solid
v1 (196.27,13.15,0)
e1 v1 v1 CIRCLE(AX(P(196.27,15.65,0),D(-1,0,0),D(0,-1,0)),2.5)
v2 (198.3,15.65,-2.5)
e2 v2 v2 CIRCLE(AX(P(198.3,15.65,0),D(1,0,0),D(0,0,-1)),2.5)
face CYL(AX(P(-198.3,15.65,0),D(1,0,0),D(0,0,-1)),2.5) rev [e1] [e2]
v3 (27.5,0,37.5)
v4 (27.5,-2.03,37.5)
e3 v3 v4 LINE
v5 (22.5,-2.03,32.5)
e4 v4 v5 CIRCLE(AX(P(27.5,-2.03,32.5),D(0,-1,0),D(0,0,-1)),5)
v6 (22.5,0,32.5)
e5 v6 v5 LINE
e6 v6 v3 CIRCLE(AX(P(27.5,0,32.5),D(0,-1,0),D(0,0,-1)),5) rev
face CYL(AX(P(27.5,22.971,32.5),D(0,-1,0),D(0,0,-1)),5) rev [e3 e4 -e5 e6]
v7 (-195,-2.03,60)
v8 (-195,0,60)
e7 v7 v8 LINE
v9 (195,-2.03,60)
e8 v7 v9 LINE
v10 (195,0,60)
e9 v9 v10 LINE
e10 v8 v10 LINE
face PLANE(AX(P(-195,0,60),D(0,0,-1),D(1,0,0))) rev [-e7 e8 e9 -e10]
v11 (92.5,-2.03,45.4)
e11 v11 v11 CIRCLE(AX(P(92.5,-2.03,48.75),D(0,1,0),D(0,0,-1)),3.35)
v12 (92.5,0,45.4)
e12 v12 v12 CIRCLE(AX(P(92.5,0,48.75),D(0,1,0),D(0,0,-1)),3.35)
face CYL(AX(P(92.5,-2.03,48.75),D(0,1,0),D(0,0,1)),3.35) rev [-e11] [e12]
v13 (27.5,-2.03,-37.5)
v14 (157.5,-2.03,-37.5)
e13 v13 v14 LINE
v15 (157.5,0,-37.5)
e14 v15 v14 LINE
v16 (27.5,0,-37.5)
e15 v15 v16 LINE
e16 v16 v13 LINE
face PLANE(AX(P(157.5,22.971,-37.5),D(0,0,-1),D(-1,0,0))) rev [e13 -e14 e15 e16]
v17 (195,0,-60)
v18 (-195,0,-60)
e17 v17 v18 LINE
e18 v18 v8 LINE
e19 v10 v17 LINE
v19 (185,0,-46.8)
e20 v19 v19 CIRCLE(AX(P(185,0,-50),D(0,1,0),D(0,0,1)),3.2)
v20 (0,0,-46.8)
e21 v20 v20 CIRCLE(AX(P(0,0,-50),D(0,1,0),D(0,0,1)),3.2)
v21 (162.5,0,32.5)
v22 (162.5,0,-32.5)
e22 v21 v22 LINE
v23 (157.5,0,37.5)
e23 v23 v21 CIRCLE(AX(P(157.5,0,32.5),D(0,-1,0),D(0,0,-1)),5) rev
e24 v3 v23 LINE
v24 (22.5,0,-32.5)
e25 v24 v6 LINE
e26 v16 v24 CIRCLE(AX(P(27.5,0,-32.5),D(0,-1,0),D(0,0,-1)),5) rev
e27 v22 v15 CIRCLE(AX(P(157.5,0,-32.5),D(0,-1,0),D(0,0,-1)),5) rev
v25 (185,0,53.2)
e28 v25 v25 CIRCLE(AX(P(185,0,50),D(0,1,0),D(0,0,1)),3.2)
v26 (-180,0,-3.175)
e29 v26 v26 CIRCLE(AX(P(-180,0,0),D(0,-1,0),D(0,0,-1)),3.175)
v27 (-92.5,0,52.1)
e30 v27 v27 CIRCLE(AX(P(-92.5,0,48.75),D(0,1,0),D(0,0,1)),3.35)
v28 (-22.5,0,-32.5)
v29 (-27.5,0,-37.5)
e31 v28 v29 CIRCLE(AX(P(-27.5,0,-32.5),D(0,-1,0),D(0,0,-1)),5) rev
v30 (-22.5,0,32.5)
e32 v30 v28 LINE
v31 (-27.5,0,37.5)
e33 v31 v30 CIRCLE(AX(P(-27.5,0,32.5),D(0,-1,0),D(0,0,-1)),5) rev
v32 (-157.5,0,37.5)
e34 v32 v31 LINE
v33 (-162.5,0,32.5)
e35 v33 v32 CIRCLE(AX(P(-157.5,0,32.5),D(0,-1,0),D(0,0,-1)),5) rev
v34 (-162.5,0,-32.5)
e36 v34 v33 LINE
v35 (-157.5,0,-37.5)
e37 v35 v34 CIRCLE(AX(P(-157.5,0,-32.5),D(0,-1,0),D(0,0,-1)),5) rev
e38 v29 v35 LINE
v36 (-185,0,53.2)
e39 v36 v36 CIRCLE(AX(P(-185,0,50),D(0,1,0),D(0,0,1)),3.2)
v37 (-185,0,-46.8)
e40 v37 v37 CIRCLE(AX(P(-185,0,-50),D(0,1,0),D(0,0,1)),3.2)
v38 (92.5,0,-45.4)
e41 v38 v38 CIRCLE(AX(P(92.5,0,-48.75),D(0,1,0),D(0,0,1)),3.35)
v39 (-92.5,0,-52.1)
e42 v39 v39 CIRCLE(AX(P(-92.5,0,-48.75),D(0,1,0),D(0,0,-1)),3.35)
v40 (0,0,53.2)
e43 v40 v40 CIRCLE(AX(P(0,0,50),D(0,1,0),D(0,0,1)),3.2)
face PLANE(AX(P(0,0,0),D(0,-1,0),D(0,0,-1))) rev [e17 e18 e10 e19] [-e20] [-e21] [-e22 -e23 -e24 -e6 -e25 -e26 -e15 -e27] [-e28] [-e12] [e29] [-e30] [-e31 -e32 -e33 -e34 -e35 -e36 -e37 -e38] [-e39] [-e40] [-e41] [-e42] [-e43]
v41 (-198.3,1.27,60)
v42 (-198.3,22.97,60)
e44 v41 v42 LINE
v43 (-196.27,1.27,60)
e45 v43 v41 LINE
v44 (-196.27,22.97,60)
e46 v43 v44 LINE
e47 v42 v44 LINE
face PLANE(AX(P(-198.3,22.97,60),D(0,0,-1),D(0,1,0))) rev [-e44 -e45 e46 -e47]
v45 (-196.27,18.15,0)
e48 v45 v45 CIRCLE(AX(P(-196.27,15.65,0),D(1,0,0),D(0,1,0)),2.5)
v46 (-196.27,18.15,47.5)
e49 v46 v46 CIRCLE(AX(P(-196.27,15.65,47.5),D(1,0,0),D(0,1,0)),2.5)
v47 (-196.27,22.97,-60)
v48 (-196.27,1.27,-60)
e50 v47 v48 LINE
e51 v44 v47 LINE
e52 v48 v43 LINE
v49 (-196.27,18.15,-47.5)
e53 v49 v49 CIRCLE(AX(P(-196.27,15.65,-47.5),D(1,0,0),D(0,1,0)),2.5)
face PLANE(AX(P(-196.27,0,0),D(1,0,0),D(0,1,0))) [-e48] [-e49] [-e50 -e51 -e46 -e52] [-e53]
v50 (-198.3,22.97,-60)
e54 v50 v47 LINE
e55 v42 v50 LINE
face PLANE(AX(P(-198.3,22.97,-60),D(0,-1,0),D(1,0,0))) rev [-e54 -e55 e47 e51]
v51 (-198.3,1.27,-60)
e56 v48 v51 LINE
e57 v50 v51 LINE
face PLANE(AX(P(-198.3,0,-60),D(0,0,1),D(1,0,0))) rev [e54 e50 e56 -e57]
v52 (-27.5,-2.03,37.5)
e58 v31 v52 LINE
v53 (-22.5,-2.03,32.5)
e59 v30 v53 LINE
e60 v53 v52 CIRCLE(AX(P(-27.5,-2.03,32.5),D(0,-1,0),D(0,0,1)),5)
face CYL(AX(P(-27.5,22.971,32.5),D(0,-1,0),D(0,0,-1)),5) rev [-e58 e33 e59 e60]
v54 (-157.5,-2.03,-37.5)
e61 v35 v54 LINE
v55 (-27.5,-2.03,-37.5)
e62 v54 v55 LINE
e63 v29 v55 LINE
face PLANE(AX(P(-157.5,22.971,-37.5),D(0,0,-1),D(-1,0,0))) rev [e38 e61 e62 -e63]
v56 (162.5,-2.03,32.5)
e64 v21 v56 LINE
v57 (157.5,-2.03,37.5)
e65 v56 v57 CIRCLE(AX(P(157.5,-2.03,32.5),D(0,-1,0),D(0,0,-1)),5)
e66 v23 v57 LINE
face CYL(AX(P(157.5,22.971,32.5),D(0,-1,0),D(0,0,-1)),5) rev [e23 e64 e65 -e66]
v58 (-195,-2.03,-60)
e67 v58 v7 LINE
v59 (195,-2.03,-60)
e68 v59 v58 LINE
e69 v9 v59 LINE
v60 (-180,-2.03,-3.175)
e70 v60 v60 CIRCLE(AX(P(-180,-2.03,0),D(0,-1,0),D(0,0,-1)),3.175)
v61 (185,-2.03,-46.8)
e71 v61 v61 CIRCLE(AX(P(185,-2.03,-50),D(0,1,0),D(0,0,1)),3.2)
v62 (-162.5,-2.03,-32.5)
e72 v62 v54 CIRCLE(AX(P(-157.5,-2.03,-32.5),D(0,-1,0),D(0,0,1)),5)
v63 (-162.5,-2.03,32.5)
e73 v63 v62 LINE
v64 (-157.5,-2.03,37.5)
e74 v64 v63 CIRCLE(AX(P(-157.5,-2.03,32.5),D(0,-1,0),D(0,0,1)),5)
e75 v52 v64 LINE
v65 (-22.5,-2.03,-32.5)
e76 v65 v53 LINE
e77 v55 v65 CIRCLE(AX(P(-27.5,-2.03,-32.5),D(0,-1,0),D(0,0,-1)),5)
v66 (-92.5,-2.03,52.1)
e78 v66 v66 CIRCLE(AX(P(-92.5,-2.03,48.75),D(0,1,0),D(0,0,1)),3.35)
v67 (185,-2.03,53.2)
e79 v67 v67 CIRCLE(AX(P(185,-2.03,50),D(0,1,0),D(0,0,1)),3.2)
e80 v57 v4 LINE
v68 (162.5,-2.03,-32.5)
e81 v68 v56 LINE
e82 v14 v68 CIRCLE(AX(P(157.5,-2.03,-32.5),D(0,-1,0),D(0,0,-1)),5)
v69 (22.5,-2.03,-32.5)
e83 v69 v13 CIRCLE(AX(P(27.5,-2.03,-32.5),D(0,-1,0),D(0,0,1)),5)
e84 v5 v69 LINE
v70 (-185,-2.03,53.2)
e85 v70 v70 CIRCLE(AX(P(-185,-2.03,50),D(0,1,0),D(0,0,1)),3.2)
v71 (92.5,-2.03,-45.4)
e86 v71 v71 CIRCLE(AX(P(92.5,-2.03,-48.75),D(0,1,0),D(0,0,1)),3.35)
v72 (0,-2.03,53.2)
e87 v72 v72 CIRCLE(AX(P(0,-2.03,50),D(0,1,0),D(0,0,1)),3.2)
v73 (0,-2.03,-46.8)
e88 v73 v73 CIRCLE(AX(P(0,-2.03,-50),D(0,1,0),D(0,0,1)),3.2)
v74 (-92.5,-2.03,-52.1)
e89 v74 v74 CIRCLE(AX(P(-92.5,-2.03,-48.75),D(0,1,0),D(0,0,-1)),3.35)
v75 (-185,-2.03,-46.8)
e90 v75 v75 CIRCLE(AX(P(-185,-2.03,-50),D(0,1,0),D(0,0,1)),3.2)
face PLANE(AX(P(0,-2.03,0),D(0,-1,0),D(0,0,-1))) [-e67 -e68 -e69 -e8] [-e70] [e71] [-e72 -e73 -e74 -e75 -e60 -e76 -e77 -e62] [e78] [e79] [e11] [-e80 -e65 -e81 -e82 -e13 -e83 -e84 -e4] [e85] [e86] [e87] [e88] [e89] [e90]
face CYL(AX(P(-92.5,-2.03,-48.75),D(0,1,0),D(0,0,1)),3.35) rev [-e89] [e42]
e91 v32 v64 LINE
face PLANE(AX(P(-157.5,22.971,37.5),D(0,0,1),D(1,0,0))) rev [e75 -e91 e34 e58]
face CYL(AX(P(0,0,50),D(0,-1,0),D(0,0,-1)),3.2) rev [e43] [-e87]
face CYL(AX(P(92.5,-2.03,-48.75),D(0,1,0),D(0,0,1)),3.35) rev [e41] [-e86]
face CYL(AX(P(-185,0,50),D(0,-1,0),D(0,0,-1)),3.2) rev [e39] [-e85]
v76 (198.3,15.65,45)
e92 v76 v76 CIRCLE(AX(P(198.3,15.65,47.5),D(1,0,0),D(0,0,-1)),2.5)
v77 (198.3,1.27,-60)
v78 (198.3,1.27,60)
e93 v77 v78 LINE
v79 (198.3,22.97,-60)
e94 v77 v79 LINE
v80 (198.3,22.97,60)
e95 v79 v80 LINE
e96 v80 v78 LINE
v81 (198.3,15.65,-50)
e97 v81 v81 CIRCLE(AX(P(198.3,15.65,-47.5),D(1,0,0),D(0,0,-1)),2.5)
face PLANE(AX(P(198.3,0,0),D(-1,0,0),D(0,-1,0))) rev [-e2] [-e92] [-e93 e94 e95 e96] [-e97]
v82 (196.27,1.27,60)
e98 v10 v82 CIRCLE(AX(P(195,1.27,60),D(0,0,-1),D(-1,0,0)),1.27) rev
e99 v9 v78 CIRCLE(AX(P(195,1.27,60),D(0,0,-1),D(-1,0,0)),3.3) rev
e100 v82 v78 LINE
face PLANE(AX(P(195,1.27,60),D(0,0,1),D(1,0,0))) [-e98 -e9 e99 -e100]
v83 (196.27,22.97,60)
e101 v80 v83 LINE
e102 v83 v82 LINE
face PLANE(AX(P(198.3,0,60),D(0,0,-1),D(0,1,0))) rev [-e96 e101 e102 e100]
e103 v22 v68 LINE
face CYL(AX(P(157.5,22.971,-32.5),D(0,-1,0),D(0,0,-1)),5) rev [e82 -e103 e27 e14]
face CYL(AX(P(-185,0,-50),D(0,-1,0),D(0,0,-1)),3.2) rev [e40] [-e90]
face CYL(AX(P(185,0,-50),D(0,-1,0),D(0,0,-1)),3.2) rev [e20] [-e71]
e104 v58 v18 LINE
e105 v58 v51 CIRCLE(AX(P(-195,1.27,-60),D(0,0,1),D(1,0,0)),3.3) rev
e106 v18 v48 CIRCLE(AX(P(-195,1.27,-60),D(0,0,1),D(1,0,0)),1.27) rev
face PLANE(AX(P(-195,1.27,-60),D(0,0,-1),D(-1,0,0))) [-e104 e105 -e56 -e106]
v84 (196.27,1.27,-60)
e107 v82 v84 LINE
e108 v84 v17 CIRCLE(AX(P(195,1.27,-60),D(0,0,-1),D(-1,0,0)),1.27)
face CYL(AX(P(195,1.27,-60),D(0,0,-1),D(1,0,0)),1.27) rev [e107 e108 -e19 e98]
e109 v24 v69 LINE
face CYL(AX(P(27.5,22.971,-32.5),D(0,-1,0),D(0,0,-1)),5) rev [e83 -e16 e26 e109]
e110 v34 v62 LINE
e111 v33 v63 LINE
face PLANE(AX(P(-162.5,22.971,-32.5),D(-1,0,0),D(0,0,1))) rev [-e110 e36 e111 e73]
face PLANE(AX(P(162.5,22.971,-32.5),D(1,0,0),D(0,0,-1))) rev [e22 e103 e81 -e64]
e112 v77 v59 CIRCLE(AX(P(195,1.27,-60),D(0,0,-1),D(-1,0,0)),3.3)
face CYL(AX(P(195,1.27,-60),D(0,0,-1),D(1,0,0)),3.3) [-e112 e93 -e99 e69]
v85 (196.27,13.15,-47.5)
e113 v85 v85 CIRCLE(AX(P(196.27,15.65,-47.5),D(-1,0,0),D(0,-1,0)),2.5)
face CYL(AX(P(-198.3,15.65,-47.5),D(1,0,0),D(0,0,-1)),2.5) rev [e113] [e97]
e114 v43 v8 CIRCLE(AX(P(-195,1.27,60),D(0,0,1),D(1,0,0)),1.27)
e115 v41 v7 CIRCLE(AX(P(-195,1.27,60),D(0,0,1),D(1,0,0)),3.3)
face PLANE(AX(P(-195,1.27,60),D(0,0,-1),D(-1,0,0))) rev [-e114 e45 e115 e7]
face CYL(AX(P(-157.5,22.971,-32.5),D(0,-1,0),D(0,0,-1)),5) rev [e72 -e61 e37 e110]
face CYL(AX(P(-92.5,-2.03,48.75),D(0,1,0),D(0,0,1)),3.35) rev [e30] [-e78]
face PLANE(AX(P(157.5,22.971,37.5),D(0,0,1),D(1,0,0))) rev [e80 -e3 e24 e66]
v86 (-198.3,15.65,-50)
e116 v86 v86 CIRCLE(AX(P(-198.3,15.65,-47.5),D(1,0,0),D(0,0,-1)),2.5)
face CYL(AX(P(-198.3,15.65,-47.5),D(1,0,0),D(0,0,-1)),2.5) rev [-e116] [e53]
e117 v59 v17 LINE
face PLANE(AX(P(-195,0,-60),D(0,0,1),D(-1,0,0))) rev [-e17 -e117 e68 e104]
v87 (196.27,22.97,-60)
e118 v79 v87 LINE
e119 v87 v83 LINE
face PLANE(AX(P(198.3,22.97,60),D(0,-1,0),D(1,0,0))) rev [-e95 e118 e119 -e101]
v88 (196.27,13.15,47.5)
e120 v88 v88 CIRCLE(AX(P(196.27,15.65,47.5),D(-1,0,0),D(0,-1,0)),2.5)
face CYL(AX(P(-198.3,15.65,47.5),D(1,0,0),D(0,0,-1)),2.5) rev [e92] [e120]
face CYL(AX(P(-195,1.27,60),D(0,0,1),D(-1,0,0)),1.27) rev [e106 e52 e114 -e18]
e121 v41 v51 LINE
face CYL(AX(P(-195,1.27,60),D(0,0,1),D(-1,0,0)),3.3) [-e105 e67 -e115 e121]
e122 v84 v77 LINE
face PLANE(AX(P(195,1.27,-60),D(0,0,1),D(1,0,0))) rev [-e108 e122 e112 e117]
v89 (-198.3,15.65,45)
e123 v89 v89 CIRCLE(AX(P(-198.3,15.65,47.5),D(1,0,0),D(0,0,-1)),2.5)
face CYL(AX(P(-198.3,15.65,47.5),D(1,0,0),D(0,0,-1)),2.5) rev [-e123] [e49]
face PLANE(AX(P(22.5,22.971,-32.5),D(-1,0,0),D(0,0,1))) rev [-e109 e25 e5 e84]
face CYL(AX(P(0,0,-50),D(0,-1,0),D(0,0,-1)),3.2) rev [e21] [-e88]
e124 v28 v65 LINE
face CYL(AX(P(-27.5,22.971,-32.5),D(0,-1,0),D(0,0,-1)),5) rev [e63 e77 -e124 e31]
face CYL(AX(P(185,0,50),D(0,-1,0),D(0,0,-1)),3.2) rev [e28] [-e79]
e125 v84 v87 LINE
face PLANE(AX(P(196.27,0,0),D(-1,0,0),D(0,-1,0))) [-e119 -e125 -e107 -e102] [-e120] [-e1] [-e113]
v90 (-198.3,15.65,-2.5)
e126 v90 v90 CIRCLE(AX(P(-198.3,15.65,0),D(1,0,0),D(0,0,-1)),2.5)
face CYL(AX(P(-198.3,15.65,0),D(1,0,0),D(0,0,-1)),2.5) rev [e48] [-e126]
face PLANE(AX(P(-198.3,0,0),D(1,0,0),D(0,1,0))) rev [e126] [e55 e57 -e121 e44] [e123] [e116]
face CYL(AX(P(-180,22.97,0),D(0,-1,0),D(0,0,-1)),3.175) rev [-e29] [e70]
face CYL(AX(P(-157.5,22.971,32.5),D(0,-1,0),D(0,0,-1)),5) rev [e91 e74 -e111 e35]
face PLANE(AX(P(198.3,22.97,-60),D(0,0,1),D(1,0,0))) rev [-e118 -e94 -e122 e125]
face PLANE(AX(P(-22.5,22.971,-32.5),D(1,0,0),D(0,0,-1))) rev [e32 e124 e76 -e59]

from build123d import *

# Parameters (mm, degrees)
SKETCH1_W               = 390
SKETCH1_H               = 120
SKETCH1_R               = 3.2
BOSS_EXTRUDE1_DEPTH     = 2.03
EDGE_FLANGE1_DEPTH      = 120
EDGE_FLANGE1_BEND_DEPTH = 120
CUT_EXTRUDE1_REACH      = 210.681
CUT_EXTRUDE2_DEPTH      = 209.447861347
CUT_EXTRUDE2_DEPTH_BACK = 209.447861347
SKETCH19_R              = 2.5
SKETCH20_R              = 3.35
CUT_EXTRUDE3_DEPTH      = 209.447861347
SKETCH21_R              = 3.175
CUT_EXTRUDE4_DEPTH      = 209.681312053


# Sheet-metal steps are written as plain solids
with BuildPart() as part:
    # Sketch1 → Boss-Extrude1 (new body)
    with BuildSketch(Plane(origin=(0, 0, 0), x_dir=(1, 0, 0), z_dir=(0, 1, 0))):
        Rectangle(SKETCH1_W, SKETCH1_H)
        with Locations(Location((0, 50, 0), (0, 0, 270))):
            Circle(SKETCH1_R, mode=Mode.SUBTRACT)
        with Locations(Location((-185, 50, 0), (0, 0, 270))):
            Circle(SKETCH1_R, mode=Mode.SUBTRACT)
        with Locations(Location((-185, -50, 0), (0, 0, 270))):
            Circle(SKETCH1_R, mode=Mode.SUBTRACT)
        with Locations(Location((0, -50, 0), (0, 0, 270))):
            Circle(SKETCH1_R, mode=Mode.SUBTRACT)
        with Locations(Location((185, -50, 0), (0, 0, 270))):
            Circle(SKETCH1_R, mode=Mode.SUBTRACT)
        with Locations(Location((185, 50, 0), (0, 0, 270))):
            Circle(SKETCH1_R, mode=Mode.SUBTRACT)
    extrude(amount=-BOSS_EXTRUDE1_DEPTH)

    # Edge-Flange1 section (across the edge) → Edge-Flange1 (add)
    with BuildSketch(Plane(origin=(-196.27, 0, -60), x_dir=(1, 0, 0), z_dir=(0, 0, 1))):
        with BuildLine():
            Line((-2.03, 1.27), (-2.03, 22.97))
            Line((-2.03, 22.97), (0, 22.97))
            Line((0, 22.97), (0, 1.27))
            ThreePointArc((0, 1.27), (0.371974388, 0.371974388), (1.27, 0))
            Line((1.27, 0), (1.27, -2.03))
            ThreePointArc((1.27, -2.03), (-1.063452378, -1.063452378), (-2.03, 1.27))
        make_face()
    extrude(amount=EDGE_FLANGE1_DEPTH)

    # Edge-Flange1 section 2 (across the edge) → Edge-Flange1 bend (add)
    with BuildSketch(Plane(origin=(196.27, 0, 60), x_dir=(-1, 0, 0), z_dir=(0, 0, -1))):
        with BuildLine():
            Line((-2.03, 1.27), (-2.03, 22.97))
            Line((-2.03, 22.97), (0, 22.97))
            Line((0, 22.97), (0, 1.27))
            ThreePointArc((0, 1.27), (0.371974388, 0.371974388), (1.27, 0))
            Line((1.27, 0), (1.27, -2.03))
            ThreePointArc((1.27, -2.03), (-1.063452378, -1.063452378), (-2.03, 1.27))
        make_face()
    extrude(amount=EDGE_FLANGE1_BEND_DEPTH)

    # Sketch18 → Cut-Extrude1 (cut, up to next)
    with BuildSketch(Plane.XZ.offset(2.03), mode=Mode.PRIVATE) as cut_extrude1_sk1:
        with BuildLine():
            Line((-157.5, -37.5), (-27.5, -37.5))
            ThreePointArc((-27.5, -37.5), (-23.964466094, -36.035533906), (-22.5, -32.5))
            Line((-22.5, -32.5), (-22.5, 32.5))
            ThreePointArc((-22.5, 32.5), (-23.964466094, 36.035533906), (-27.5, 37.5))
            Line((-27.5, 37.5), (-157.5, 37.5))
            ThreePointArc((-157.5, 37.5), (-161.035533906, 36.035533906), (-162.5, 32.5))
            Line((-162.5, 32.5), (-162.5, -32.5))
            ThreePointArc((-162.5, -32.5), (-161.035533906, -36.035533906), (-157.5, -37.5))
        make_face()
    cut_extrude1_tool1 = extrude(cut_extrude1_sk1.sketch, amount=-CUT_EXTRUDE1_REACH, mode=Mode.PRIVATE) & part.part
    # Sketch18 → Cut-Extrude1 (cut, up to next)
    with BuildSketch(Plane.XZ.offset(2.03), mode=Mode.PRIVATE) as cut_extrude1_sk2:
        with BuildLine():
            Line((22.5, -32.5), (22.5, 32.5))
            ThreePointArc((22.5, 32.5), (23.964466094, 36.035533906), (27.5, 37.5))
            Line((27.5, 37.5), (157.5, 37.5))
            ThreePointArc((157.5, 37.5), (161.035533906, 36.035533906), (162.5, 32.5))
            Line((162.5, 32.5), (162.5, -32.5))
            ThreePointArc((162.5, -32.5), (161.035533906, -36.035533906), (157.5, -37.5))
            Line((157.5, -37.5), (27.5, -37.5))
            ThreePointArc((27.5, -37.5), (23.964466094, -36.035533906), (22.5, -32.5))
        make_face()
    cut_extrude1_tool2 = extrude(cut_extrude1_sk2.sketch, amount=-CUT_EXTRUDE1_REACH, mode=Mode.PRIVATE) & part.part
    add(cut_extrude1_tool1.solids().sort_by_distance((-92.5, -2.03, 0))[0], mode=Mode.SUBTRACT)
    add(cut_extrude1_tool2.solids().sort_by_distance((92.5, -2.03, 0))[0], mode=Mode.SUBTRACT)

    # Sketch19 → Cut-Extrude2 (cut, two sides: drawn at the far end of the back side and taken through both)
    with BuildSketch(Plane(origin=(0, 0, 0), x_dir=(0, 0, -1), z_dir=(1, 0, 0)).offset(-CUT_EXTRUDE2_DEPTH_BACK)):
        with Locations((-47.5, 15.65)):
            Circle(SKETCH19_R)
        with Locations((0, 15.65)):
            Circle(SKETCH19_R)
        with Locations((47.5, 15.65)):
            Circle(SKETCH19_R)
    extrude(amount=CUT_EXTRUDE2_DEPTH + CUT_EXTRUDE2_DEPTH_BACK, mode=Mode.SUBTRACT)

    # Sketch20 → Cut-Extrude3 (cut, through all)
    with BuildSketch(Plane(origin=(0, 0, 0), x_dir=(1, 0, 0), z_dir=(0, 1, 0))):
        with Locations(Location((-92.5, -48.75, 0), (0, 0, 270))):
            Circle(SKETCH20_R)
        with Locations(Location((92.5, -48.75, 0), (0, 0, 90))):
            Circle(SKETCH20_R)
        with Locations(Location((92.5, 48.75, 0), (0, 0, 270))):
            Circle(SKETCH20_R)
        with Locations(Location((-92.5, 48.75, 0), (0, 0, 90))):
            Circle(SKETCH20_R)
    extrude(amount=-CUT_EXTRUDE3_DEPTH, mode=Mode.SUBTRACT)

    # Sketch21 → Cut-Extrude4 (cut, through all)
    with BuildSketch(Plane.XZ.offset(2.03)):
        with Locations(Location((-180, 0, 0), (0, 0, 270))):
            Circle(SKETCH21_R)
    extrude(amount=-CUT_EXTRUDE4_DEPTH, mode=Mode.SUBTRACT)


solid = part.part
